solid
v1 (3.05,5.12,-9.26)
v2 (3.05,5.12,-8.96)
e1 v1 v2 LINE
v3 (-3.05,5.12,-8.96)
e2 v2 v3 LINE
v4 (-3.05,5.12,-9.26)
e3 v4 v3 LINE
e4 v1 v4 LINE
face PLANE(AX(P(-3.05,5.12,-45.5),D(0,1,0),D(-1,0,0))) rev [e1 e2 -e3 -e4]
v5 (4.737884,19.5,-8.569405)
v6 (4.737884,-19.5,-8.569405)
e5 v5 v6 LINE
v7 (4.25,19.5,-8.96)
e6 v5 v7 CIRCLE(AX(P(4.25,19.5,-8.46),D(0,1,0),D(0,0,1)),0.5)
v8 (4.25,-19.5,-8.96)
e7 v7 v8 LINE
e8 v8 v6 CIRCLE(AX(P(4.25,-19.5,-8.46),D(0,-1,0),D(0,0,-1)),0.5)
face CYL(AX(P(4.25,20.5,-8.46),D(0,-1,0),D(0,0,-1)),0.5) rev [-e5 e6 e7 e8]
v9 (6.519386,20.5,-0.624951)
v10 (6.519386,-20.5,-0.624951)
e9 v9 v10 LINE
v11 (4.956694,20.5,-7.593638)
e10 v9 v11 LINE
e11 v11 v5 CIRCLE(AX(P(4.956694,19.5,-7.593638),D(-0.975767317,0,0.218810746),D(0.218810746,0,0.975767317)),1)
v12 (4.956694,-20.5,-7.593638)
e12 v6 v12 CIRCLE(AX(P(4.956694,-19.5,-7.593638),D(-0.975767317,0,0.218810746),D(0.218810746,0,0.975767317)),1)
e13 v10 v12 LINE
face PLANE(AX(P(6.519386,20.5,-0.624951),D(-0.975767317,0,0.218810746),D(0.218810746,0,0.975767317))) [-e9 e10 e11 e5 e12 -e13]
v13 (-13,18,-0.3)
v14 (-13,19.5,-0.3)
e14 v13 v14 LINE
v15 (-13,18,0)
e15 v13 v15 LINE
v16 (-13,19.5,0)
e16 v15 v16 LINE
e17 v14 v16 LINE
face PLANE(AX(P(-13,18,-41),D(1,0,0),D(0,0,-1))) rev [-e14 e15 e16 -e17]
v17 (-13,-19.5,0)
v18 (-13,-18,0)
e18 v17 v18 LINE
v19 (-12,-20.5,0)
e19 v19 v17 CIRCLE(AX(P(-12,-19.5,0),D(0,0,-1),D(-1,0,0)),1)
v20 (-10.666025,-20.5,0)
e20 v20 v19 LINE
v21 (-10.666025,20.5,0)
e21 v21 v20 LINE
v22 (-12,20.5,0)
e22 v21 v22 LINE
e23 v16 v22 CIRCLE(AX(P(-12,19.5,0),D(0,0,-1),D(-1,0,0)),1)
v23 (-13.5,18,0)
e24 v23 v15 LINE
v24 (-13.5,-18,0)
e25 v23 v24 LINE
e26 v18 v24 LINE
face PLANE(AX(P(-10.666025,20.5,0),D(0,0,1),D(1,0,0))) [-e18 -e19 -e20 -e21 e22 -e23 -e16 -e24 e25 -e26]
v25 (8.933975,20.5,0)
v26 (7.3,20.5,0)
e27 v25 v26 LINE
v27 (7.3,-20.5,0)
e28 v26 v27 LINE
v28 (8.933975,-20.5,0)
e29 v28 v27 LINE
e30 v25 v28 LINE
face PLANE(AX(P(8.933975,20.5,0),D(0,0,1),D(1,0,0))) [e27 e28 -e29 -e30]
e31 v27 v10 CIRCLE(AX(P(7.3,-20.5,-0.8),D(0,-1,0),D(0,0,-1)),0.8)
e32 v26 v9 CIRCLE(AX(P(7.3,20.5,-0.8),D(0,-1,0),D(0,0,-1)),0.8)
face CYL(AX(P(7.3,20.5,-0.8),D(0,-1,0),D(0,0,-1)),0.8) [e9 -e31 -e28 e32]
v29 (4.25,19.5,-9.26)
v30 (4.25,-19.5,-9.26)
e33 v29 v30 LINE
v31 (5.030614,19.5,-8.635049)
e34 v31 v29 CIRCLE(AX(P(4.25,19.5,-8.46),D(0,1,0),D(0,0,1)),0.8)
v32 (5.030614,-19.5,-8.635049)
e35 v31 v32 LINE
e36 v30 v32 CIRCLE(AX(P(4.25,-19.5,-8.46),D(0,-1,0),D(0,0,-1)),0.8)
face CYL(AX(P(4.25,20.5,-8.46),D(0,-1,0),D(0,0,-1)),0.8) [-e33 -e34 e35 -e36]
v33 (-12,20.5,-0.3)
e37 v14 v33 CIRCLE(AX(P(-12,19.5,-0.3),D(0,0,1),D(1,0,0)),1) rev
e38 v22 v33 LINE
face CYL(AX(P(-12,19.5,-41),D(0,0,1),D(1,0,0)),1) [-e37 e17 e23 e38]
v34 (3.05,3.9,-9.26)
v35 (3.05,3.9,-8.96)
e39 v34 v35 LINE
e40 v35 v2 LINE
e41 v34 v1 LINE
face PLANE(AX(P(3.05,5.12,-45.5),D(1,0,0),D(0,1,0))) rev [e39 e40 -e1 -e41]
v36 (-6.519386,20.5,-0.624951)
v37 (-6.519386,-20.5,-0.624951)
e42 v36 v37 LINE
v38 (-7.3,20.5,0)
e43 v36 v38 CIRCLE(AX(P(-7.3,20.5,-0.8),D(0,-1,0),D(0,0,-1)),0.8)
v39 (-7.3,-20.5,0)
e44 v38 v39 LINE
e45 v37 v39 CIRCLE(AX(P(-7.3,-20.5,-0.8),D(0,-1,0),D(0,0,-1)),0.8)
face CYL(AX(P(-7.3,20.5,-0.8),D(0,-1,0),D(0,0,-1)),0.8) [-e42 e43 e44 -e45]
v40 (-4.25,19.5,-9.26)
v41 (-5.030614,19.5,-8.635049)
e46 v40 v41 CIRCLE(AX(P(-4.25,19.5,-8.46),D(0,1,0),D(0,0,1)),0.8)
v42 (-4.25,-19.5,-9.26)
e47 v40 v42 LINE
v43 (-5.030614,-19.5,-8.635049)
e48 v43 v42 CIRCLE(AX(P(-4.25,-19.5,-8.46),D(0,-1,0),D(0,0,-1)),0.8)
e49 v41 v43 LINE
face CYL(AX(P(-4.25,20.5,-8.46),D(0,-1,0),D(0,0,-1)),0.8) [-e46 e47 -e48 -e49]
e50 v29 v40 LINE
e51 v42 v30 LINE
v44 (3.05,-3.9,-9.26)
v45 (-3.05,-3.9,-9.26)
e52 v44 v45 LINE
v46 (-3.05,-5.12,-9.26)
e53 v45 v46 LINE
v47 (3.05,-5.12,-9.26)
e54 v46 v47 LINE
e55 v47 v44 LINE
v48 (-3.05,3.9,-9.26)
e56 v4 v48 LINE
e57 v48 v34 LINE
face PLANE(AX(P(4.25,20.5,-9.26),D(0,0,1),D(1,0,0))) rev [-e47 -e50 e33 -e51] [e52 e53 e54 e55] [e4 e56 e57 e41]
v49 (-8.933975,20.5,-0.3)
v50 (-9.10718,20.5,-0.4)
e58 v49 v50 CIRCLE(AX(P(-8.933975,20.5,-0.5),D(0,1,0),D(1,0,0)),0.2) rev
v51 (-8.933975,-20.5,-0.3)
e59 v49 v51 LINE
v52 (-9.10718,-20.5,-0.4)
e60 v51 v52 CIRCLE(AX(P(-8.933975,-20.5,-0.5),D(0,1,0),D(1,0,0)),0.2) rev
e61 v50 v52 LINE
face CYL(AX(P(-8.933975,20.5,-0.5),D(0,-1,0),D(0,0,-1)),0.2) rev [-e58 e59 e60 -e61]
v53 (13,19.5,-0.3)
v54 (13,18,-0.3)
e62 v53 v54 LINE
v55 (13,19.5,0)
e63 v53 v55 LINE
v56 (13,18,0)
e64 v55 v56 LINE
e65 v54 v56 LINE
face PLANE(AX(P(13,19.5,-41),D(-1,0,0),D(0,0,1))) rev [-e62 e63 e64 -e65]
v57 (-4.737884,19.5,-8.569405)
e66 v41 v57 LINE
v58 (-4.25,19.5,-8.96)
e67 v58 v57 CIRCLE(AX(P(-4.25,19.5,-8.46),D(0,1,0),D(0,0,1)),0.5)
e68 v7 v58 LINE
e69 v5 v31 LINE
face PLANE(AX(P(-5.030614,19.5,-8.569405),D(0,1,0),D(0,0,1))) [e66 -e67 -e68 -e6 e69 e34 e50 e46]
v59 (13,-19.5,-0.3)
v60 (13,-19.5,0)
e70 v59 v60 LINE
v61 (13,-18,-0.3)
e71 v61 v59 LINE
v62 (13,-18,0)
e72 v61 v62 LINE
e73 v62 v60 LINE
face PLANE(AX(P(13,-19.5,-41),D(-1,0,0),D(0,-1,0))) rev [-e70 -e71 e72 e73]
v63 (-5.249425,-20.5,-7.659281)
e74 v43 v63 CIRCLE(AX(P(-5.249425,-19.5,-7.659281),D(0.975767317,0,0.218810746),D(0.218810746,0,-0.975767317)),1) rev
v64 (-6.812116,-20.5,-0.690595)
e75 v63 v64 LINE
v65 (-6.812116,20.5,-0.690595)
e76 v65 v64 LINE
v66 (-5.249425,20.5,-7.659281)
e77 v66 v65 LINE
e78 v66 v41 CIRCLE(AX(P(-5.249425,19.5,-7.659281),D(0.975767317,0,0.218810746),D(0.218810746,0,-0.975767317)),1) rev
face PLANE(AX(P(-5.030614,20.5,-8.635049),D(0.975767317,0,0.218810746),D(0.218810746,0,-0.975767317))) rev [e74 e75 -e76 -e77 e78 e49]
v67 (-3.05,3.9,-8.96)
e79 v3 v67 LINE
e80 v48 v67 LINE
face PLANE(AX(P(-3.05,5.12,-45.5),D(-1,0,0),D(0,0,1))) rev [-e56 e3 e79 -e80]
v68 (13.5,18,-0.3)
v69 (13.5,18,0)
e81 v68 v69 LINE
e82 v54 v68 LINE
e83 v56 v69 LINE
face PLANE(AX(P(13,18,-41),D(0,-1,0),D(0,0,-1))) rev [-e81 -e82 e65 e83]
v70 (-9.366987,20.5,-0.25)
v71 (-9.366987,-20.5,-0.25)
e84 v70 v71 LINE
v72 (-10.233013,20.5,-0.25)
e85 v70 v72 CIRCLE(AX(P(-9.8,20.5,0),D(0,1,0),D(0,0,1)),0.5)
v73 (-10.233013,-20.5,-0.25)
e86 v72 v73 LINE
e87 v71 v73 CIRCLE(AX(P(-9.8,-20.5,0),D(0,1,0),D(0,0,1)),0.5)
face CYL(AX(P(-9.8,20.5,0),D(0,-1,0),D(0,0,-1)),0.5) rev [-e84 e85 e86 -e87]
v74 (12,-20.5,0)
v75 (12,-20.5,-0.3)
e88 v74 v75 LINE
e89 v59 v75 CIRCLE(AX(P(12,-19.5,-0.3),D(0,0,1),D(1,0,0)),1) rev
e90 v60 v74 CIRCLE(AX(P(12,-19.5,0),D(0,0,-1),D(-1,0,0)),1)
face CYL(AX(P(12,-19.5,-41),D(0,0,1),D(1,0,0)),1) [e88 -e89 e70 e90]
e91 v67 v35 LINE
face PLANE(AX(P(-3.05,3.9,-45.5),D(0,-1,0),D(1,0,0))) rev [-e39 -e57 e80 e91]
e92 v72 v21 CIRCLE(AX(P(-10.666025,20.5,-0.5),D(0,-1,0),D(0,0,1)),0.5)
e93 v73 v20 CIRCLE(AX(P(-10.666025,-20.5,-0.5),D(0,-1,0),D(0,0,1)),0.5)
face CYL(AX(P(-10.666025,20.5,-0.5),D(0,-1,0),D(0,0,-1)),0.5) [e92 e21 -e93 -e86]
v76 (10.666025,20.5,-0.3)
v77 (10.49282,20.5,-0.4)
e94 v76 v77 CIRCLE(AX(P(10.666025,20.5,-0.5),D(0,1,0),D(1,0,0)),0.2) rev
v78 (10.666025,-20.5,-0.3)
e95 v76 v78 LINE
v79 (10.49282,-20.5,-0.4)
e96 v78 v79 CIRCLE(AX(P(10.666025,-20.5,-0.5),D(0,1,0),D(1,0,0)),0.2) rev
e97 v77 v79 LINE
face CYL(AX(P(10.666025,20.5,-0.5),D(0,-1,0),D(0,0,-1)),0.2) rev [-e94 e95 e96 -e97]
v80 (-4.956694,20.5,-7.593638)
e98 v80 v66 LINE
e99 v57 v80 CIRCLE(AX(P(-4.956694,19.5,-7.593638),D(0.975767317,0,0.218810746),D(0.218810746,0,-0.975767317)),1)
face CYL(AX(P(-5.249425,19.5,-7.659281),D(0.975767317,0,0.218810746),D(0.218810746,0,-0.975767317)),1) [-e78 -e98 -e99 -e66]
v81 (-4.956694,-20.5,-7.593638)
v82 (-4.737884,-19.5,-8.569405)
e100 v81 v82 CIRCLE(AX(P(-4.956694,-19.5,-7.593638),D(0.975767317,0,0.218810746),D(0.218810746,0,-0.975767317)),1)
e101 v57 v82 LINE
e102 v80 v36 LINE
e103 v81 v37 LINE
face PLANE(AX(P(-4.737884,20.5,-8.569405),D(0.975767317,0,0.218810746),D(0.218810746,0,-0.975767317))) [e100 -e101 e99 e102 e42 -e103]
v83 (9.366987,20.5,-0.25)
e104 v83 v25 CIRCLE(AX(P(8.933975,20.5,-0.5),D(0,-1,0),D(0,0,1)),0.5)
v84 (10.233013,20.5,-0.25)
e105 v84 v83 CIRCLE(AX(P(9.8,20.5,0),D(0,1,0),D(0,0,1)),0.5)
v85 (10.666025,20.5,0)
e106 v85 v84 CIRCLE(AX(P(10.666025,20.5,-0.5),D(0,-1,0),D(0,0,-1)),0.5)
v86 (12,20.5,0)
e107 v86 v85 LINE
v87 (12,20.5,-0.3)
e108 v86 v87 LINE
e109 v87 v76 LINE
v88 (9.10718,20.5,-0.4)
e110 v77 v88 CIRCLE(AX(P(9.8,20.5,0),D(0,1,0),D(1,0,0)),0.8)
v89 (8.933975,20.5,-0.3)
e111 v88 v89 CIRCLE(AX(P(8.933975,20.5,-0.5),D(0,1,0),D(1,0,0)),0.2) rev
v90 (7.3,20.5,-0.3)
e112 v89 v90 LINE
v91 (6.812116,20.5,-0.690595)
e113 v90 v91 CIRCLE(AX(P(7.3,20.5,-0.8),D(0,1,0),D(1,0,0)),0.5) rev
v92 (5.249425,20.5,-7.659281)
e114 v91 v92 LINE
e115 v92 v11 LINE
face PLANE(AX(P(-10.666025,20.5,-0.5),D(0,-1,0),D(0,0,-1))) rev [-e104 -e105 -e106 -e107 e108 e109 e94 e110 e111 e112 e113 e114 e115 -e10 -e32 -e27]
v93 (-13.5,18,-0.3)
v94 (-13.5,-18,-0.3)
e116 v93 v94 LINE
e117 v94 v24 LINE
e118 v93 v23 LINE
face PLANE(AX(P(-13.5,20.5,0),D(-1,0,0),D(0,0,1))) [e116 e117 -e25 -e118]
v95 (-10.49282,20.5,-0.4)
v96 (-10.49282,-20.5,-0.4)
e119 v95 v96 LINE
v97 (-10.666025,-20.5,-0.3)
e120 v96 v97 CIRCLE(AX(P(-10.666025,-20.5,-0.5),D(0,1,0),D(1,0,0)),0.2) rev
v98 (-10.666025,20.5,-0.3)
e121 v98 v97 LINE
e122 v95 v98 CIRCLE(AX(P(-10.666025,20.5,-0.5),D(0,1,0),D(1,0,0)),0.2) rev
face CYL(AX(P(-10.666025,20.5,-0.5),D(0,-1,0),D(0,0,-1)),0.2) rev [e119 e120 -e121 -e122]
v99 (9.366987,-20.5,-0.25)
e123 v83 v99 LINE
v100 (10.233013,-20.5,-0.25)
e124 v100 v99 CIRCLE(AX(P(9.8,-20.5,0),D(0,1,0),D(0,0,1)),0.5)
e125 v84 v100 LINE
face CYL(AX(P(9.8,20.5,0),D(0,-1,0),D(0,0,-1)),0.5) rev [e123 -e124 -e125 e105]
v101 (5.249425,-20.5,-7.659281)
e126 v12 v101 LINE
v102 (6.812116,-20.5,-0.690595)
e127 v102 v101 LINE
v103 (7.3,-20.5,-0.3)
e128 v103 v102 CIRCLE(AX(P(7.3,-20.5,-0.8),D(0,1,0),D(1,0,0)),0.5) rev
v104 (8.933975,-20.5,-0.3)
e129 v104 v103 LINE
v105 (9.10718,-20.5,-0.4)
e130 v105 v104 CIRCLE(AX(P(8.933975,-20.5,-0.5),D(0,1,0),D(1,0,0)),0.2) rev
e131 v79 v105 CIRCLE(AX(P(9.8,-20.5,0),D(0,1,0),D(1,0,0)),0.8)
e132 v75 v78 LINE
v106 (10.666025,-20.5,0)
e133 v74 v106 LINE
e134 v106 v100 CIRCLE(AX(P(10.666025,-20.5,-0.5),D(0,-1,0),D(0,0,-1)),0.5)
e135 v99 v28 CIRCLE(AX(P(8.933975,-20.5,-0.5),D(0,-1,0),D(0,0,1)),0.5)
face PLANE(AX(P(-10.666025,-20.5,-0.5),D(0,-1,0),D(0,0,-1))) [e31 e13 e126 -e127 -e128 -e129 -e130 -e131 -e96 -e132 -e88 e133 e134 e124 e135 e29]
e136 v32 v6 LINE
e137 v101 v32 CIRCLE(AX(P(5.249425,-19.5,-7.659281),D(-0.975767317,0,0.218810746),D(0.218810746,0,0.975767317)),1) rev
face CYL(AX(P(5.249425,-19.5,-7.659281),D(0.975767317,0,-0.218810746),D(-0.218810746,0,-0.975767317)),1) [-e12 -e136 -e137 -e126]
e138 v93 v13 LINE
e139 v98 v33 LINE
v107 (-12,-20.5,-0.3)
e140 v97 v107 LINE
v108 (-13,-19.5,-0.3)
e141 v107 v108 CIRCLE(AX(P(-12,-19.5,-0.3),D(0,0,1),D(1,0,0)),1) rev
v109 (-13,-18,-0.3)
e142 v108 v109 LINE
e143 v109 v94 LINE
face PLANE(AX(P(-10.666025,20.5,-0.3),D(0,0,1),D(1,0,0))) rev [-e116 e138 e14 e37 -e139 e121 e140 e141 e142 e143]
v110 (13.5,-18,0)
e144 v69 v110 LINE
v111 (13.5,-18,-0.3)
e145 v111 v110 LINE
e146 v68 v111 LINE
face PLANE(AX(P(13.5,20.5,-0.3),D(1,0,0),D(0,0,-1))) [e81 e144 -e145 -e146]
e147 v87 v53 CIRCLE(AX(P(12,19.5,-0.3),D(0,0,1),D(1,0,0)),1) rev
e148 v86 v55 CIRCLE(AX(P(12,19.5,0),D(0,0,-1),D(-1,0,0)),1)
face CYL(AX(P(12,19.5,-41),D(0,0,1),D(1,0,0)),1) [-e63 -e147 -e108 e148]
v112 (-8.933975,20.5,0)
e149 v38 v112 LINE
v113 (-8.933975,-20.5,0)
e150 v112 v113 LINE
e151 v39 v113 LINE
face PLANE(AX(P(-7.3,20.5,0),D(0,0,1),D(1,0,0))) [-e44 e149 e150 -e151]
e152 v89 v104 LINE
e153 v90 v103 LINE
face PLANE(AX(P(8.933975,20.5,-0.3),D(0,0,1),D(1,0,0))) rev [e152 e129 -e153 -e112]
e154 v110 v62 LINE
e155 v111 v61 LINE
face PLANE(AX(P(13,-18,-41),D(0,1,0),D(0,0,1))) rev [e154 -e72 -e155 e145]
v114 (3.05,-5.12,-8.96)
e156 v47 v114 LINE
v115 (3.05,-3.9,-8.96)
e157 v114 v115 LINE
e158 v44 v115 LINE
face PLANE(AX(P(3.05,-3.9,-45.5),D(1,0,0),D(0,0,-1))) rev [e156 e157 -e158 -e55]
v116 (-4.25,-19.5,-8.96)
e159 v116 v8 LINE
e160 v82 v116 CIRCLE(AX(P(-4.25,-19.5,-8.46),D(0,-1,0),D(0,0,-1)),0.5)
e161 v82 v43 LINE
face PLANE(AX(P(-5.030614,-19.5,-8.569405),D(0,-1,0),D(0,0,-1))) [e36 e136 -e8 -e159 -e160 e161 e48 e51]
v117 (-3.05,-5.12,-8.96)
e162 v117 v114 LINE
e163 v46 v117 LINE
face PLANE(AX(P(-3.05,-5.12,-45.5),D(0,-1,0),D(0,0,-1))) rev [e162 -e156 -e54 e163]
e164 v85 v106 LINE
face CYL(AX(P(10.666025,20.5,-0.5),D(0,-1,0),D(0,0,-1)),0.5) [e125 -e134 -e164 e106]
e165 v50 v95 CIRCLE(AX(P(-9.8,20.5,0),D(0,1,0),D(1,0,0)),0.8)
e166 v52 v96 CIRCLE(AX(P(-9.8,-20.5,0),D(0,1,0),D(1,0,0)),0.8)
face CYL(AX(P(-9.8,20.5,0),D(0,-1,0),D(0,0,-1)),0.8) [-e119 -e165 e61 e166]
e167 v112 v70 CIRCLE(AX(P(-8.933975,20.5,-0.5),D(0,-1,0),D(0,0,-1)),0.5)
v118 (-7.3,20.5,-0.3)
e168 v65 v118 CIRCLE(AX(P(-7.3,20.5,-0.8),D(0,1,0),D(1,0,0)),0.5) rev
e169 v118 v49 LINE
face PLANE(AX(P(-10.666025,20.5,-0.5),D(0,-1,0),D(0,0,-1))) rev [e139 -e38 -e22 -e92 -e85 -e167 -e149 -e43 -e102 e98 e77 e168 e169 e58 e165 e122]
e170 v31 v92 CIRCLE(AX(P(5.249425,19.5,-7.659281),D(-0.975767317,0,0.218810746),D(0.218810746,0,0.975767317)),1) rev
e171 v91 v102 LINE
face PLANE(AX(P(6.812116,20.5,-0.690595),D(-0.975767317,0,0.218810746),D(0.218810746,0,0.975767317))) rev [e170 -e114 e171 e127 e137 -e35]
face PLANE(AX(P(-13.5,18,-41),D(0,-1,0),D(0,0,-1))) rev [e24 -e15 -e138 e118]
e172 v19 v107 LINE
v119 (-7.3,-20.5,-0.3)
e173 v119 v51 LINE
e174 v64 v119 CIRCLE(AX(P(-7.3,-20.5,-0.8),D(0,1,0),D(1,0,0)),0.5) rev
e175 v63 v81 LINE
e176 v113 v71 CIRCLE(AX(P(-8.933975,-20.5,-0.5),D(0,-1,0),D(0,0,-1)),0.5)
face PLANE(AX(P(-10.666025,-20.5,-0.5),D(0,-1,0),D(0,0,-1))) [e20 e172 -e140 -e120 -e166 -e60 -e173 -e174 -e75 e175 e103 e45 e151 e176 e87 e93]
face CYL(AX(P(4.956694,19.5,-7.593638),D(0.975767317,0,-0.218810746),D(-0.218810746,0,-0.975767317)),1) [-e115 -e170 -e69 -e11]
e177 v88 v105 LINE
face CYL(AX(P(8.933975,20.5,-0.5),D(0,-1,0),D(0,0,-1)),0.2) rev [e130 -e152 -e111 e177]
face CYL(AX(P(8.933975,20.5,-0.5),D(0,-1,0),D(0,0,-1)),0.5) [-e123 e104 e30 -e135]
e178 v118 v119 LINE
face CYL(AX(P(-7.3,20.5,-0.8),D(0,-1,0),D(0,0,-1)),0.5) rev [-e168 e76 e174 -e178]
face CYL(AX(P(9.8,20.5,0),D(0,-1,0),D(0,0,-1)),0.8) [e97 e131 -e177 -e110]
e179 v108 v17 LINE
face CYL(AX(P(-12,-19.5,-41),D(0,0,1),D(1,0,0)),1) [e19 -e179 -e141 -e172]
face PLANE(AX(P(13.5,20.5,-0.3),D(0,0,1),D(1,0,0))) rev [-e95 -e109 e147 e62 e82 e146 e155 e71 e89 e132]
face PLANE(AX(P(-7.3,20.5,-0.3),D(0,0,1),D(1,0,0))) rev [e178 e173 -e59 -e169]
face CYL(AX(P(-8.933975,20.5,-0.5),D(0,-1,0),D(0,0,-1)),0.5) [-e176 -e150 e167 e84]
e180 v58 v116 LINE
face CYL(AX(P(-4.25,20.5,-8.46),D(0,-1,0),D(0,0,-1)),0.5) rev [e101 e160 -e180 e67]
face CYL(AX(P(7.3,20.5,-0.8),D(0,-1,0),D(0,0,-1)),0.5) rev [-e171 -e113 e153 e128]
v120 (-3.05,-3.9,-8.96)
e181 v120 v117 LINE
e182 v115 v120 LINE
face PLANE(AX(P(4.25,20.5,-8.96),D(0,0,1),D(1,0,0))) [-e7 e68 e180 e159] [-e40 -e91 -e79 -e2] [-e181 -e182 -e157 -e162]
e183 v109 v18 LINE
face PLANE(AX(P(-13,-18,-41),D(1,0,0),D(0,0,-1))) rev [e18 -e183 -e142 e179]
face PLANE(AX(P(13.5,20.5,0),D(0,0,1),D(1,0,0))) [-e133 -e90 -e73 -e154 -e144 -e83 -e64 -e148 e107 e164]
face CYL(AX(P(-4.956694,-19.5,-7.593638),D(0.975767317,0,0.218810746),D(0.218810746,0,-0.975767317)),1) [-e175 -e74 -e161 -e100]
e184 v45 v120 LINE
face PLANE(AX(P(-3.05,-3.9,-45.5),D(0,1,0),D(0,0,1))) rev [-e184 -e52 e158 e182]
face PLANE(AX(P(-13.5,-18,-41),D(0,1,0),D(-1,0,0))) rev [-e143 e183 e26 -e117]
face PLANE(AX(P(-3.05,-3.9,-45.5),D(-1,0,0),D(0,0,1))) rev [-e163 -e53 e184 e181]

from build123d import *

# Parameters (mm, degrees)
EXTRUDE_THIN1_DEPTH = 20.5
EXTRUDE1_DEPTH      = 41
EXTRUDE2_DEPTH      = 1
FILLET1_R           = 1
EXTRUDE3_DEPTH      = 1
FILLET2_R           = 1
SKETCH5_W           = 6.1
SKETCH5_H           = 1.22
EXTRUDE4_DEPTH      = 45.5


with BuildPart() as part:
    # Sketch1 → Extrude-Thin1 (new, symmetric)
    with BuildSketch(Plane(origin=(0, 0, 0), x_dir=(1, 0, 0), z_dir=(0, 1, 0))):
        with BuildLine():
            Line((13.5, 0), (10.666025404, 0))
            ThreePointArc((10.666025404, 0), (10.416025404, 0.066987298), (10.233012702, 0.25))
            ThreePointArc((10.233012702, 0.25), (9.8, 0.5), (9.366987298, 0.25))
            ThreePointArc((9.366987298, 0.25), (9.183974596, 0.066987298), (8.933974596, 0))
            Line((8.933974596, 0), (7.3, 0))
            ThreePointArc((7.3, 0), (6.800019439, 0.175484637), (6.519386146, 0.624951403))
            Line((6.519386146, 0.624951403), (4.737883659, 8.569405373))
            ThreePointArc((4.737883659, 8.569405373), (4.56248785, 8.850322102), (4.25, 8.96))
            Line((4.25, 8.96), (-4.25, 8.96))
            ThreePointArc((-4.25, 8.96), (-4.56248785, 8.850322102), (-4.737883659, 8.569405373))
            Line((-4.737883659, 8.569405373), (-6.519386146, 0.624951403))
            ThreePointArc((-6.519386146, 0.624951403), (-6.800019439, 0.175484637), (-7.3, 0))
            Line((-7.3, 0), (-8.933974596, 0))
            ThreePointArc((-8.933974596, 0), (-9.183974596, 0.066987298), (-9.366987298, 0.25))
            ThreePointArc((-9.366987298, 0.25), (-9.8, 0.5), (-10.233012702, 0.25))
            ThreePointArc((-10.233012702, 0.25), (-10.416025404, 0.066987298), (-10.666025404, 0))
            Line((-10.666025404, 0), (-13.5, 0))
            Line((-13.5, 0), (-13.5, 0.3))
            Line((-13.5, 0.3), (-10.666025404, 0.3))
            ThreePointArc((-10.666025404, 0.3), (-10.566025404, 0.326794919), (-10.492820323, 0.4))
            ThreePointArc((-10.492820323, 0.4), (-9.8, 0.8), (-9.107179677, 0.4))
            ThreePointArc((-9.107179677, 0.4), (-9.033974596, 0.326794919), (-8.933974596, 0.3))
            Line((-8.933974596, 0.3), (-7.3, 0.3))
            ThreePointArc((-7.3, 0.3), (-6.98751215, 0.409677898), (-6.812116341, 0.690594627))
            Line((-6.812116341, 0.690594627), (-5.030613854, 8.635048597))
            ThreePointArc((-5.030613854, 8.635048597), (-4.749980561, 9.084515363), (-4.25, 9.26))
            Line((-4.25, 9.26), (4.25, 9.26))
            ThreePointArc((4.25, 9.26), (4.749980561, 9.084515363), (5.030613854, 8.635048597))
            Line((5.030613854, 8.635048597), (6.812116341, 0.690594627))
            ThreePointArc((6.812116341, 0.690594627), (6.98751215, 0.409677898), (7.3, 0.3))
            Line((7.3, 0.3), (8.933974596, 0.3))
            ThreePointArc((8.933974596, 0.3), (9.033974596, 0.326794919), (9.107179677, 0.4))
            ThreePointArc((9.107179677, 0.4), (9.8, 0.8), (10.492820323, 0.4))
            ThreePointArc((10.492820323, 0.4), (10.566025404, 0.326794919), (10.666025404, 0.3))
            Line((10.666025404, 0.3), (13.5, 0.3))
            Line((13.5, 0.3), (13.5, 0))
        make_face()
    extrude(amount=EXTRUDE_THIN1_DEPTH, both=True)

    # Sketch2 → Extrude1 (cut)
    with BuildSketch(Plane.XY):
        with BuildLine():
            Line((-13.5, 18), (-13, 18))
            Line((-13, 18), (-13, 19.5))
            ThreePointArc((-13, 19.5), (-12.707106781, 20.207106781), (-12, 20.5))
            Line((-12, 20.5), (0, 20.5))
            Line((0, 20.5), (12, 20.5))
            ThreePointArc((12, 20.5), (12.707106781, 20.207106781), (13, 19.5))
            Line((13, 19.5), (13, 18))
            Line((13, 18), (13.5, 18))
            Line((13.5, 18), (13.5, 21.5))
            Line((13.5, 21.5), (-13.5, 21.5))
            Line((-13.5, 21.5), (-13.5, 18))
        make_face()
        with BuildLine():
            Line((-13.5, -18), (-13, -18))
            Line((-13, -18), (-13, -19.5))
            ThreePointArc((-13, -19.5), (-12.707106781, -20.207106781), (-12, -20.5))
            Line((-12, -20.5), (12, -20.5))
            ThreePointArc((12, -20.5), (12.707106781, -20.207106781), (13, -19.5))
            Line((13, -19.5), (13, -18))
            Line((13, -18), (13.5, -18))
            Line((13.5, -18), (13.5, -21.5))
            Line((13.5, -21.5), (-13.5, -21.5))
            Line((-13.5, -21.5), (-13.5, -18))
        make_face()
    extrude(amount=-EXTRUDE1_DEPTH, mode=Mode.SUBTRACT)

    # Sketch3 → Extrude2 (cut)
    with BuildSketch(Plane(origin=(0, 20.5, 0), x_dir=(1, 0, 0), z_dir=(0, 1, 0))):
        Polygon((-5.030613854, 8.635048597), (-4.737883659, 8.569405373), (4.737883659, 8.569405373), (5.030613854, 8.635048597), (5.030613854, 9.569405373), (-5.030613854, 9.569405373), align=None)
    extrude(amount=-EXTRUDE2_DEPTH, mode=Mode.SUBTRACT)

    # Fillet1
    fillet1_edges = [part.edges().sort_by_distance(p)[0] for p in [
        (-4.884248756, 20.5, -8.602226985),
        (4.884248756, 20.5, -8.602226985),
    ]]
    fillet(fillet1_edges, radius=FILLET1_R - 0.0001)  # a hair under: the kernel refuses the full size

    # Sketch4 → Extrude3 (cut)
    with BuildSketch(Plane.XZ.offset(20.5)):
        Polygon((-4.737883659, -8.569405373), (-5.030613854, -8.635048597), (-5.030613854, -10.26), (5.030613854, -10.26), (5.030613854, -8.635048597), (4.737883659, -8.569405373), align=None)
    extrude(amount=-EXTRUDE3_DEPTH, mode=Mode.SUBTRACT)

    # Fillet2
    fillet2_edges = [part.edges().sort_by_distance(p)[0] for p in [
        (4.884248756, -20.5, -8.602226985),
        (-4.884248756, -20.5, -8.602226985),
    ]]
    fillet(fillet2_edges, radius=FILLET2_R - 0.0001)  # a hair under: the kernel refuses the full size

    # Sketch5 → Extrude4 (cut)
    with BuildSketch(Plane.XY):
        with Locations((0, 4.51)):
            Rectangle(SKETCH5_W, SKETCH5_H)
        with Locations((0, -4.51)):
            Rectangle(SKETCH5_W, SKETCH5_H)
    extrude(amount=-EXTRUDE4_DEPTH, mode=Mode.SUBTRACT)


solid = part.part
